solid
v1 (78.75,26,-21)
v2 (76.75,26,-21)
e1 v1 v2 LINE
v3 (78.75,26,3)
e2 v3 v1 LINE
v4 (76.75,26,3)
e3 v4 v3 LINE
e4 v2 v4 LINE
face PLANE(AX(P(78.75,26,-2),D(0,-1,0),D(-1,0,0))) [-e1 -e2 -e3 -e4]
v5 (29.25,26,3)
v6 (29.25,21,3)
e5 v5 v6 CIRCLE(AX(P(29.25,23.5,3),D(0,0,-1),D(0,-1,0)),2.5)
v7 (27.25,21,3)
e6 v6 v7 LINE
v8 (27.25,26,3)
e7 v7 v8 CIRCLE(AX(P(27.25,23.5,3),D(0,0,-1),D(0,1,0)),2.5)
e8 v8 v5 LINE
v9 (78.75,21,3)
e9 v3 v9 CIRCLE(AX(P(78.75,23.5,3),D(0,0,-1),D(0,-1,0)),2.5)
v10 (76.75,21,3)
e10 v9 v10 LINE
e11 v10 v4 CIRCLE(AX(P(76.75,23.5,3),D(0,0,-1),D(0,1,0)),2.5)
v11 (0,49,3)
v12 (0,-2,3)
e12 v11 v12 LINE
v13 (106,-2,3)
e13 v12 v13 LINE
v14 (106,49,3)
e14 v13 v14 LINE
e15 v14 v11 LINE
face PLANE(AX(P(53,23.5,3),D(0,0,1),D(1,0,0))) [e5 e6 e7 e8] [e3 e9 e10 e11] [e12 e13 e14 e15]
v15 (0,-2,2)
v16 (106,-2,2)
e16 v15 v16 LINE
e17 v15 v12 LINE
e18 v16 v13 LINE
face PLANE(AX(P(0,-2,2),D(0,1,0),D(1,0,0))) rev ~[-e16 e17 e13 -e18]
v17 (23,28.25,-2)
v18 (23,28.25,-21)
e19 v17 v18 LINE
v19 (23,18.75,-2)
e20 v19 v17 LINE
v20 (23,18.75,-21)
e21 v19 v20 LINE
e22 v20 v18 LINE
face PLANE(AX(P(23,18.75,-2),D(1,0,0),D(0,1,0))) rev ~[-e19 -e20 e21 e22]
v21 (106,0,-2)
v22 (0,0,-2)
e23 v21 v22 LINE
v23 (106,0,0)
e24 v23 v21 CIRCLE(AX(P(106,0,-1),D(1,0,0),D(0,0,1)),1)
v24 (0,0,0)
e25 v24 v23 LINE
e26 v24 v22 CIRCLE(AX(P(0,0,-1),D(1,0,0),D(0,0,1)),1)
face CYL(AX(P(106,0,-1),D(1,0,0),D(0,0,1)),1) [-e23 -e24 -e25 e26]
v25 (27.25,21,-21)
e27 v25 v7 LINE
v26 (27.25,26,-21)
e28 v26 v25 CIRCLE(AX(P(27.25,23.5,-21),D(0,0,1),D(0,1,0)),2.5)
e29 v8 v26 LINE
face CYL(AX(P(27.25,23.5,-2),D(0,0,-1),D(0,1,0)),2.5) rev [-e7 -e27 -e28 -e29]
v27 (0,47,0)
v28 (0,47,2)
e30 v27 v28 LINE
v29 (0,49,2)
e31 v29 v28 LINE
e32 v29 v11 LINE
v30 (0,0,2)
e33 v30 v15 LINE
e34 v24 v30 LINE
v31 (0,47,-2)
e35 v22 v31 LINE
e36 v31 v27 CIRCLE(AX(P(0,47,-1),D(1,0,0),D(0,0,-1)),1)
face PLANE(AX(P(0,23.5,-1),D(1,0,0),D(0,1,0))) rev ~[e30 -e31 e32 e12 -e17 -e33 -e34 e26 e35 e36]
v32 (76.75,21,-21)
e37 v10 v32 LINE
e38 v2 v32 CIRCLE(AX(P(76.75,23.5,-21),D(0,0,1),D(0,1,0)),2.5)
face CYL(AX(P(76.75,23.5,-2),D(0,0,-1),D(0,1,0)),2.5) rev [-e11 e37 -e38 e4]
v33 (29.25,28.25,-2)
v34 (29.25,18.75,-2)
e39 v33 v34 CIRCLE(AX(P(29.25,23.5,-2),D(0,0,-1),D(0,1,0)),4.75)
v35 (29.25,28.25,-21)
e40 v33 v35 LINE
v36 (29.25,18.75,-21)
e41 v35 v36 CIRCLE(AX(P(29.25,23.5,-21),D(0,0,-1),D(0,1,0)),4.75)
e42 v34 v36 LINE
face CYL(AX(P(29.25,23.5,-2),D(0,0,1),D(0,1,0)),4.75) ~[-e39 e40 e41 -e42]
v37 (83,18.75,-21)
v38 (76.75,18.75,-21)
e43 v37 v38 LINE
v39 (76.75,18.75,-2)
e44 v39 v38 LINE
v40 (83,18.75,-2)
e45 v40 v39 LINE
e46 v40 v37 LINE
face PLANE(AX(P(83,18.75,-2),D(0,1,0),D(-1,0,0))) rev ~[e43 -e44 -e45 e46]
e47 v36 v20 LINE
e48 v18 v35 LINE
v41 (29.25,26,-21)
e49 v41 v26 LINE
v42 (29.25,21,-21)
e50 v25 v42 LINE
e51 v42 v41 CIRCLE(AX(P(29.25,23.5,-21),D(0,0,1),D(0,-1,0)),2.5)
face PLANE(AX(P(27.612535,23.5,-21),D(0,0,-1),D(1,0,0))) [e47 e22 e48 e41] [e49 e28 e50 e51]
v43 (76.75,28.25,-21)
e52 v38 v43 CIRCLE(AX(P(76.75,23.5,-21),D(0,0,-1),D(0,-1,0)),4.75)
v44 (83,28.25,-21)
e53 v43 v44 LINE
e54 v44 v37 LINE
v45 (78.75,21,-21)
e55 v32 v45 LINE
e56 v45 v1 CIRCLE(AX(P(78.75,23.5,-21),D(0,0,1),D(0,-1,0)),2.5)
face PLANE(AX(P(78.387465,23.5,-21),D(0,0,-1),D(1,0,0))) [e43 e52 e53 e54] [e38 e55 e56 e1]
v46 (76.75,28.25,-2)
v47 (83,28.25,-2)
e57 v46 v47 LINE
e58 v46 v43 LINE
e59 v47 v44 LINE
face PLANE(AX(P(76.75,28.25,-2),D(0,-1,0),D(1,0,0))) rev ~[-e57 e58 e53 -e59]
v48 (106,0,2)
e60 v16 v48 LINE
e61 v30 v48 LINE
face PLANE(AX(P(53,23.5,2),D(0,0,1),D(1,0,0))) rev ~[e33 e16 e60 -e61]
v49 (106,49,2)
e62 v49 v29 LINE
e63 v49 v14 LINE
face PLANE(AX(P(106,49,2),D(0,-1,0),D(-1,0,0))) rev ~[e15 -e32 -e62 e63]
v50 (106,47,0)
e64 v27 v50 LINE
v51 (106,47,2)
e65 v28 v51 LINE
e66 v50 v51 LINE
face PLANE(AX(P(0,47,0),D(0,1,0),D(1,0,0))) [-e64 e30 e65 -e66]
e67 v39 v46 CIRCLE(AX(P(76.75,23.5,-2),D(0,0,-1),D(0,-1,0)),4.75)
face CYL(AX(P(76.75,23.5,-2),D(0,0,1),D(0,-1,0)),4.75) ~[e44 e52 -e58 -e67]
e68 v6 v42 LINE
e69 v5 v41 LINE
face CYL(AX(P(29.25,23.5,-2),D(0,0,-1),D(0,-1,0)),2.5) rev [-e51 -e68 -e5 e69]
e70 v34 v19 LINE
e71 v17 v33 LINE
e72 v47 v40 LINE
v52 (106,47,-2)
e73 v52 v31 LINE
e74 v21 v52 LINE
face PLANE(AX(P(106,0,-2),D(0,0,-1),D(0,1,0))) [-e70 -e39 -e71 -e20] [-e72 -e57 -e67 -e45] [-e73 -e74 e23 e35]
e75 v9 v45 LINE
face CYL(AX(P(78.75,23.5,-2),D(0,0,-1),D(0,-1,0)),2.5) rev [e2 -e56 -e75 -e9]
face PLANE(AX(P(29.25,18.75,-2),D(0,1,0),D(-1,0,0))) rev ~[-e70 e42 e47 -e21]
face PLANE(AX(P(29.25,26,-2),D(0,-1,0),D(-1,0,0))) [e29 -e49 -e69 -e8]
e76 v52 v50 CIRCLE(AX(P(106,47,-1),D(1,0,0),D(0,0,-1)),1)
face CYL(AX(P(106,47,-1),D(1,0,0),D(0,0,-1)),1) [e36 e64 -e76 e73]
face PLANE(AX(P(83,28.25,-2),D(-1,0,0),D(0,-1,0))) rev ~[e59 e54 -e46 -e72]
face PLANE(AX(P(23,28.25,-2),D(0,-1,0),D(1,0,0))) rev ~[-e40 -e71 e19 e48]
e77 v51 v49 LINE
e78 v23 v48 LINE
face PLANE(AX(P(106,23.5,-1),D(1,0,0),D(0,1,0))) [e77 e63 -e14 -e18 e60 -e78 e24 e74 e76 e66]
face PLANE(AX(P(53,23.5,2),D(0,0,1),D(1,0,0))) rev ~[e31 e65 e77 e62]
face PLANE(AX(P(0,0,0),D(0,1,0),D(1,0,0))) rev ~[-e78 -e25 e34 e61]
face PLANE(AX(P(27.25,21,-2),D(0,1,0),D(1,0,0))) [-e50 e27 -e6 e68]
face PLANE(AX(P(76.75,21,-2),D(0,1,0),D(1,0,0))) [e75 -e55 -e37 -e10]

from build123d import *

# Parameters (mm, degrees)
F0_W     = 106
F0_H     = 47
F1_DEPTH = 2
F3_DEPTH = 1
F5_DEPTH = 106
F7_DEPTH = 19
F8_DEPTH = 25


with BuildPart() as f1:
    # F0 (on Top) → F1 (new body)
    with BuildSketch(Plane.XY):
        with Locations((53, 23.5)):
            Rectangle(F0_W, F0_H)
    extrude(amount=F1_DEPTH)

    # F2 (on face) → F3 (join)
    with BuildSketch(Plane.XY.offset(2)):
        Polygon((0, 49), (0, 0), (0, -2), (106, -2), (106, 49), align=None)
    extrude(amount=F3_DEPTH)

    # F4 (on face) → F5 (join)
    with BuildSketch(Plane.YZ.offset(106)):
        with BuildLine():
            Line((47, 0), (0, 0))
            ThreePointArc((0, 0), (-1, -1), (0, -2))
            Line((0, -2), (47, -2))
            ThreePointArc((47, -2), (48, -1), (47, 0))
        make_face()
    extrude(amount=-F5_DEPTH)

    # F6 (on face) → F7 (join)
    with BuildSketch(Plane(origin=(0, 0, -2), x_dir=(1, 0, 0), z_dir=(0, 0, -1))):
        with BuildLine():
            Line((23, -28.25), (29.25, -28.25))
            ThreePointArc((29.25, -28.25), (34, -23.5), (29.25, -18.75))
            Line((29.25, -18.75), (23, -18.75))
            Line((23, -18.75), (23, -28.25))
        make_face()
        with BuildLine():
            Line((27.25, -21), (29.25, -21))
            ThreePointArc((29.25, -21), (31.75, -23.5), (29.25, -26))
            Line((29.25, -26), (27.25, -26))
            ThreePointArc((27.25, -26), (24.75, -23.5), (27.25, -21))
        make_face(mode=Mode.SUBTRACT)
        with BuildLine():
            Line((83, -18.75), (76.75, -18.75))
            ThreePointArc((76.75, -18.75), (72, -23.5), (76.75, -28.25))
            Line((76.75, -28.25), (83, -28.25))
            Line((83, -28.25), (83, -18.75))
        make_face()
        with BuildLine():
            ThreePointArc((76.75, -26), (74.25, -23.5), (76.75, -21))
            Line((76.75, -21), (78.75, -21))
            ThreePointArc((78.75, -21), (81.25, -23.5), (78.75, -26))
            Line((78.75, -26), (76.75, -26))
        make_face(mode=Mode.SUBTRACT)
    extrude(amount=F7_DEPTH)

    # F8 (cut): faces of the model
    f8_faces = [f1.faces().sort_by_distance(p)[0] for p in [
        (28.25, 23.5, -2),
        (77.75, 23.5, -2),
    ]]
    extrude(f8_faces, amount=-F8_DEPTH, mode=Mode.SUBTRACT)


solid = f1.part
